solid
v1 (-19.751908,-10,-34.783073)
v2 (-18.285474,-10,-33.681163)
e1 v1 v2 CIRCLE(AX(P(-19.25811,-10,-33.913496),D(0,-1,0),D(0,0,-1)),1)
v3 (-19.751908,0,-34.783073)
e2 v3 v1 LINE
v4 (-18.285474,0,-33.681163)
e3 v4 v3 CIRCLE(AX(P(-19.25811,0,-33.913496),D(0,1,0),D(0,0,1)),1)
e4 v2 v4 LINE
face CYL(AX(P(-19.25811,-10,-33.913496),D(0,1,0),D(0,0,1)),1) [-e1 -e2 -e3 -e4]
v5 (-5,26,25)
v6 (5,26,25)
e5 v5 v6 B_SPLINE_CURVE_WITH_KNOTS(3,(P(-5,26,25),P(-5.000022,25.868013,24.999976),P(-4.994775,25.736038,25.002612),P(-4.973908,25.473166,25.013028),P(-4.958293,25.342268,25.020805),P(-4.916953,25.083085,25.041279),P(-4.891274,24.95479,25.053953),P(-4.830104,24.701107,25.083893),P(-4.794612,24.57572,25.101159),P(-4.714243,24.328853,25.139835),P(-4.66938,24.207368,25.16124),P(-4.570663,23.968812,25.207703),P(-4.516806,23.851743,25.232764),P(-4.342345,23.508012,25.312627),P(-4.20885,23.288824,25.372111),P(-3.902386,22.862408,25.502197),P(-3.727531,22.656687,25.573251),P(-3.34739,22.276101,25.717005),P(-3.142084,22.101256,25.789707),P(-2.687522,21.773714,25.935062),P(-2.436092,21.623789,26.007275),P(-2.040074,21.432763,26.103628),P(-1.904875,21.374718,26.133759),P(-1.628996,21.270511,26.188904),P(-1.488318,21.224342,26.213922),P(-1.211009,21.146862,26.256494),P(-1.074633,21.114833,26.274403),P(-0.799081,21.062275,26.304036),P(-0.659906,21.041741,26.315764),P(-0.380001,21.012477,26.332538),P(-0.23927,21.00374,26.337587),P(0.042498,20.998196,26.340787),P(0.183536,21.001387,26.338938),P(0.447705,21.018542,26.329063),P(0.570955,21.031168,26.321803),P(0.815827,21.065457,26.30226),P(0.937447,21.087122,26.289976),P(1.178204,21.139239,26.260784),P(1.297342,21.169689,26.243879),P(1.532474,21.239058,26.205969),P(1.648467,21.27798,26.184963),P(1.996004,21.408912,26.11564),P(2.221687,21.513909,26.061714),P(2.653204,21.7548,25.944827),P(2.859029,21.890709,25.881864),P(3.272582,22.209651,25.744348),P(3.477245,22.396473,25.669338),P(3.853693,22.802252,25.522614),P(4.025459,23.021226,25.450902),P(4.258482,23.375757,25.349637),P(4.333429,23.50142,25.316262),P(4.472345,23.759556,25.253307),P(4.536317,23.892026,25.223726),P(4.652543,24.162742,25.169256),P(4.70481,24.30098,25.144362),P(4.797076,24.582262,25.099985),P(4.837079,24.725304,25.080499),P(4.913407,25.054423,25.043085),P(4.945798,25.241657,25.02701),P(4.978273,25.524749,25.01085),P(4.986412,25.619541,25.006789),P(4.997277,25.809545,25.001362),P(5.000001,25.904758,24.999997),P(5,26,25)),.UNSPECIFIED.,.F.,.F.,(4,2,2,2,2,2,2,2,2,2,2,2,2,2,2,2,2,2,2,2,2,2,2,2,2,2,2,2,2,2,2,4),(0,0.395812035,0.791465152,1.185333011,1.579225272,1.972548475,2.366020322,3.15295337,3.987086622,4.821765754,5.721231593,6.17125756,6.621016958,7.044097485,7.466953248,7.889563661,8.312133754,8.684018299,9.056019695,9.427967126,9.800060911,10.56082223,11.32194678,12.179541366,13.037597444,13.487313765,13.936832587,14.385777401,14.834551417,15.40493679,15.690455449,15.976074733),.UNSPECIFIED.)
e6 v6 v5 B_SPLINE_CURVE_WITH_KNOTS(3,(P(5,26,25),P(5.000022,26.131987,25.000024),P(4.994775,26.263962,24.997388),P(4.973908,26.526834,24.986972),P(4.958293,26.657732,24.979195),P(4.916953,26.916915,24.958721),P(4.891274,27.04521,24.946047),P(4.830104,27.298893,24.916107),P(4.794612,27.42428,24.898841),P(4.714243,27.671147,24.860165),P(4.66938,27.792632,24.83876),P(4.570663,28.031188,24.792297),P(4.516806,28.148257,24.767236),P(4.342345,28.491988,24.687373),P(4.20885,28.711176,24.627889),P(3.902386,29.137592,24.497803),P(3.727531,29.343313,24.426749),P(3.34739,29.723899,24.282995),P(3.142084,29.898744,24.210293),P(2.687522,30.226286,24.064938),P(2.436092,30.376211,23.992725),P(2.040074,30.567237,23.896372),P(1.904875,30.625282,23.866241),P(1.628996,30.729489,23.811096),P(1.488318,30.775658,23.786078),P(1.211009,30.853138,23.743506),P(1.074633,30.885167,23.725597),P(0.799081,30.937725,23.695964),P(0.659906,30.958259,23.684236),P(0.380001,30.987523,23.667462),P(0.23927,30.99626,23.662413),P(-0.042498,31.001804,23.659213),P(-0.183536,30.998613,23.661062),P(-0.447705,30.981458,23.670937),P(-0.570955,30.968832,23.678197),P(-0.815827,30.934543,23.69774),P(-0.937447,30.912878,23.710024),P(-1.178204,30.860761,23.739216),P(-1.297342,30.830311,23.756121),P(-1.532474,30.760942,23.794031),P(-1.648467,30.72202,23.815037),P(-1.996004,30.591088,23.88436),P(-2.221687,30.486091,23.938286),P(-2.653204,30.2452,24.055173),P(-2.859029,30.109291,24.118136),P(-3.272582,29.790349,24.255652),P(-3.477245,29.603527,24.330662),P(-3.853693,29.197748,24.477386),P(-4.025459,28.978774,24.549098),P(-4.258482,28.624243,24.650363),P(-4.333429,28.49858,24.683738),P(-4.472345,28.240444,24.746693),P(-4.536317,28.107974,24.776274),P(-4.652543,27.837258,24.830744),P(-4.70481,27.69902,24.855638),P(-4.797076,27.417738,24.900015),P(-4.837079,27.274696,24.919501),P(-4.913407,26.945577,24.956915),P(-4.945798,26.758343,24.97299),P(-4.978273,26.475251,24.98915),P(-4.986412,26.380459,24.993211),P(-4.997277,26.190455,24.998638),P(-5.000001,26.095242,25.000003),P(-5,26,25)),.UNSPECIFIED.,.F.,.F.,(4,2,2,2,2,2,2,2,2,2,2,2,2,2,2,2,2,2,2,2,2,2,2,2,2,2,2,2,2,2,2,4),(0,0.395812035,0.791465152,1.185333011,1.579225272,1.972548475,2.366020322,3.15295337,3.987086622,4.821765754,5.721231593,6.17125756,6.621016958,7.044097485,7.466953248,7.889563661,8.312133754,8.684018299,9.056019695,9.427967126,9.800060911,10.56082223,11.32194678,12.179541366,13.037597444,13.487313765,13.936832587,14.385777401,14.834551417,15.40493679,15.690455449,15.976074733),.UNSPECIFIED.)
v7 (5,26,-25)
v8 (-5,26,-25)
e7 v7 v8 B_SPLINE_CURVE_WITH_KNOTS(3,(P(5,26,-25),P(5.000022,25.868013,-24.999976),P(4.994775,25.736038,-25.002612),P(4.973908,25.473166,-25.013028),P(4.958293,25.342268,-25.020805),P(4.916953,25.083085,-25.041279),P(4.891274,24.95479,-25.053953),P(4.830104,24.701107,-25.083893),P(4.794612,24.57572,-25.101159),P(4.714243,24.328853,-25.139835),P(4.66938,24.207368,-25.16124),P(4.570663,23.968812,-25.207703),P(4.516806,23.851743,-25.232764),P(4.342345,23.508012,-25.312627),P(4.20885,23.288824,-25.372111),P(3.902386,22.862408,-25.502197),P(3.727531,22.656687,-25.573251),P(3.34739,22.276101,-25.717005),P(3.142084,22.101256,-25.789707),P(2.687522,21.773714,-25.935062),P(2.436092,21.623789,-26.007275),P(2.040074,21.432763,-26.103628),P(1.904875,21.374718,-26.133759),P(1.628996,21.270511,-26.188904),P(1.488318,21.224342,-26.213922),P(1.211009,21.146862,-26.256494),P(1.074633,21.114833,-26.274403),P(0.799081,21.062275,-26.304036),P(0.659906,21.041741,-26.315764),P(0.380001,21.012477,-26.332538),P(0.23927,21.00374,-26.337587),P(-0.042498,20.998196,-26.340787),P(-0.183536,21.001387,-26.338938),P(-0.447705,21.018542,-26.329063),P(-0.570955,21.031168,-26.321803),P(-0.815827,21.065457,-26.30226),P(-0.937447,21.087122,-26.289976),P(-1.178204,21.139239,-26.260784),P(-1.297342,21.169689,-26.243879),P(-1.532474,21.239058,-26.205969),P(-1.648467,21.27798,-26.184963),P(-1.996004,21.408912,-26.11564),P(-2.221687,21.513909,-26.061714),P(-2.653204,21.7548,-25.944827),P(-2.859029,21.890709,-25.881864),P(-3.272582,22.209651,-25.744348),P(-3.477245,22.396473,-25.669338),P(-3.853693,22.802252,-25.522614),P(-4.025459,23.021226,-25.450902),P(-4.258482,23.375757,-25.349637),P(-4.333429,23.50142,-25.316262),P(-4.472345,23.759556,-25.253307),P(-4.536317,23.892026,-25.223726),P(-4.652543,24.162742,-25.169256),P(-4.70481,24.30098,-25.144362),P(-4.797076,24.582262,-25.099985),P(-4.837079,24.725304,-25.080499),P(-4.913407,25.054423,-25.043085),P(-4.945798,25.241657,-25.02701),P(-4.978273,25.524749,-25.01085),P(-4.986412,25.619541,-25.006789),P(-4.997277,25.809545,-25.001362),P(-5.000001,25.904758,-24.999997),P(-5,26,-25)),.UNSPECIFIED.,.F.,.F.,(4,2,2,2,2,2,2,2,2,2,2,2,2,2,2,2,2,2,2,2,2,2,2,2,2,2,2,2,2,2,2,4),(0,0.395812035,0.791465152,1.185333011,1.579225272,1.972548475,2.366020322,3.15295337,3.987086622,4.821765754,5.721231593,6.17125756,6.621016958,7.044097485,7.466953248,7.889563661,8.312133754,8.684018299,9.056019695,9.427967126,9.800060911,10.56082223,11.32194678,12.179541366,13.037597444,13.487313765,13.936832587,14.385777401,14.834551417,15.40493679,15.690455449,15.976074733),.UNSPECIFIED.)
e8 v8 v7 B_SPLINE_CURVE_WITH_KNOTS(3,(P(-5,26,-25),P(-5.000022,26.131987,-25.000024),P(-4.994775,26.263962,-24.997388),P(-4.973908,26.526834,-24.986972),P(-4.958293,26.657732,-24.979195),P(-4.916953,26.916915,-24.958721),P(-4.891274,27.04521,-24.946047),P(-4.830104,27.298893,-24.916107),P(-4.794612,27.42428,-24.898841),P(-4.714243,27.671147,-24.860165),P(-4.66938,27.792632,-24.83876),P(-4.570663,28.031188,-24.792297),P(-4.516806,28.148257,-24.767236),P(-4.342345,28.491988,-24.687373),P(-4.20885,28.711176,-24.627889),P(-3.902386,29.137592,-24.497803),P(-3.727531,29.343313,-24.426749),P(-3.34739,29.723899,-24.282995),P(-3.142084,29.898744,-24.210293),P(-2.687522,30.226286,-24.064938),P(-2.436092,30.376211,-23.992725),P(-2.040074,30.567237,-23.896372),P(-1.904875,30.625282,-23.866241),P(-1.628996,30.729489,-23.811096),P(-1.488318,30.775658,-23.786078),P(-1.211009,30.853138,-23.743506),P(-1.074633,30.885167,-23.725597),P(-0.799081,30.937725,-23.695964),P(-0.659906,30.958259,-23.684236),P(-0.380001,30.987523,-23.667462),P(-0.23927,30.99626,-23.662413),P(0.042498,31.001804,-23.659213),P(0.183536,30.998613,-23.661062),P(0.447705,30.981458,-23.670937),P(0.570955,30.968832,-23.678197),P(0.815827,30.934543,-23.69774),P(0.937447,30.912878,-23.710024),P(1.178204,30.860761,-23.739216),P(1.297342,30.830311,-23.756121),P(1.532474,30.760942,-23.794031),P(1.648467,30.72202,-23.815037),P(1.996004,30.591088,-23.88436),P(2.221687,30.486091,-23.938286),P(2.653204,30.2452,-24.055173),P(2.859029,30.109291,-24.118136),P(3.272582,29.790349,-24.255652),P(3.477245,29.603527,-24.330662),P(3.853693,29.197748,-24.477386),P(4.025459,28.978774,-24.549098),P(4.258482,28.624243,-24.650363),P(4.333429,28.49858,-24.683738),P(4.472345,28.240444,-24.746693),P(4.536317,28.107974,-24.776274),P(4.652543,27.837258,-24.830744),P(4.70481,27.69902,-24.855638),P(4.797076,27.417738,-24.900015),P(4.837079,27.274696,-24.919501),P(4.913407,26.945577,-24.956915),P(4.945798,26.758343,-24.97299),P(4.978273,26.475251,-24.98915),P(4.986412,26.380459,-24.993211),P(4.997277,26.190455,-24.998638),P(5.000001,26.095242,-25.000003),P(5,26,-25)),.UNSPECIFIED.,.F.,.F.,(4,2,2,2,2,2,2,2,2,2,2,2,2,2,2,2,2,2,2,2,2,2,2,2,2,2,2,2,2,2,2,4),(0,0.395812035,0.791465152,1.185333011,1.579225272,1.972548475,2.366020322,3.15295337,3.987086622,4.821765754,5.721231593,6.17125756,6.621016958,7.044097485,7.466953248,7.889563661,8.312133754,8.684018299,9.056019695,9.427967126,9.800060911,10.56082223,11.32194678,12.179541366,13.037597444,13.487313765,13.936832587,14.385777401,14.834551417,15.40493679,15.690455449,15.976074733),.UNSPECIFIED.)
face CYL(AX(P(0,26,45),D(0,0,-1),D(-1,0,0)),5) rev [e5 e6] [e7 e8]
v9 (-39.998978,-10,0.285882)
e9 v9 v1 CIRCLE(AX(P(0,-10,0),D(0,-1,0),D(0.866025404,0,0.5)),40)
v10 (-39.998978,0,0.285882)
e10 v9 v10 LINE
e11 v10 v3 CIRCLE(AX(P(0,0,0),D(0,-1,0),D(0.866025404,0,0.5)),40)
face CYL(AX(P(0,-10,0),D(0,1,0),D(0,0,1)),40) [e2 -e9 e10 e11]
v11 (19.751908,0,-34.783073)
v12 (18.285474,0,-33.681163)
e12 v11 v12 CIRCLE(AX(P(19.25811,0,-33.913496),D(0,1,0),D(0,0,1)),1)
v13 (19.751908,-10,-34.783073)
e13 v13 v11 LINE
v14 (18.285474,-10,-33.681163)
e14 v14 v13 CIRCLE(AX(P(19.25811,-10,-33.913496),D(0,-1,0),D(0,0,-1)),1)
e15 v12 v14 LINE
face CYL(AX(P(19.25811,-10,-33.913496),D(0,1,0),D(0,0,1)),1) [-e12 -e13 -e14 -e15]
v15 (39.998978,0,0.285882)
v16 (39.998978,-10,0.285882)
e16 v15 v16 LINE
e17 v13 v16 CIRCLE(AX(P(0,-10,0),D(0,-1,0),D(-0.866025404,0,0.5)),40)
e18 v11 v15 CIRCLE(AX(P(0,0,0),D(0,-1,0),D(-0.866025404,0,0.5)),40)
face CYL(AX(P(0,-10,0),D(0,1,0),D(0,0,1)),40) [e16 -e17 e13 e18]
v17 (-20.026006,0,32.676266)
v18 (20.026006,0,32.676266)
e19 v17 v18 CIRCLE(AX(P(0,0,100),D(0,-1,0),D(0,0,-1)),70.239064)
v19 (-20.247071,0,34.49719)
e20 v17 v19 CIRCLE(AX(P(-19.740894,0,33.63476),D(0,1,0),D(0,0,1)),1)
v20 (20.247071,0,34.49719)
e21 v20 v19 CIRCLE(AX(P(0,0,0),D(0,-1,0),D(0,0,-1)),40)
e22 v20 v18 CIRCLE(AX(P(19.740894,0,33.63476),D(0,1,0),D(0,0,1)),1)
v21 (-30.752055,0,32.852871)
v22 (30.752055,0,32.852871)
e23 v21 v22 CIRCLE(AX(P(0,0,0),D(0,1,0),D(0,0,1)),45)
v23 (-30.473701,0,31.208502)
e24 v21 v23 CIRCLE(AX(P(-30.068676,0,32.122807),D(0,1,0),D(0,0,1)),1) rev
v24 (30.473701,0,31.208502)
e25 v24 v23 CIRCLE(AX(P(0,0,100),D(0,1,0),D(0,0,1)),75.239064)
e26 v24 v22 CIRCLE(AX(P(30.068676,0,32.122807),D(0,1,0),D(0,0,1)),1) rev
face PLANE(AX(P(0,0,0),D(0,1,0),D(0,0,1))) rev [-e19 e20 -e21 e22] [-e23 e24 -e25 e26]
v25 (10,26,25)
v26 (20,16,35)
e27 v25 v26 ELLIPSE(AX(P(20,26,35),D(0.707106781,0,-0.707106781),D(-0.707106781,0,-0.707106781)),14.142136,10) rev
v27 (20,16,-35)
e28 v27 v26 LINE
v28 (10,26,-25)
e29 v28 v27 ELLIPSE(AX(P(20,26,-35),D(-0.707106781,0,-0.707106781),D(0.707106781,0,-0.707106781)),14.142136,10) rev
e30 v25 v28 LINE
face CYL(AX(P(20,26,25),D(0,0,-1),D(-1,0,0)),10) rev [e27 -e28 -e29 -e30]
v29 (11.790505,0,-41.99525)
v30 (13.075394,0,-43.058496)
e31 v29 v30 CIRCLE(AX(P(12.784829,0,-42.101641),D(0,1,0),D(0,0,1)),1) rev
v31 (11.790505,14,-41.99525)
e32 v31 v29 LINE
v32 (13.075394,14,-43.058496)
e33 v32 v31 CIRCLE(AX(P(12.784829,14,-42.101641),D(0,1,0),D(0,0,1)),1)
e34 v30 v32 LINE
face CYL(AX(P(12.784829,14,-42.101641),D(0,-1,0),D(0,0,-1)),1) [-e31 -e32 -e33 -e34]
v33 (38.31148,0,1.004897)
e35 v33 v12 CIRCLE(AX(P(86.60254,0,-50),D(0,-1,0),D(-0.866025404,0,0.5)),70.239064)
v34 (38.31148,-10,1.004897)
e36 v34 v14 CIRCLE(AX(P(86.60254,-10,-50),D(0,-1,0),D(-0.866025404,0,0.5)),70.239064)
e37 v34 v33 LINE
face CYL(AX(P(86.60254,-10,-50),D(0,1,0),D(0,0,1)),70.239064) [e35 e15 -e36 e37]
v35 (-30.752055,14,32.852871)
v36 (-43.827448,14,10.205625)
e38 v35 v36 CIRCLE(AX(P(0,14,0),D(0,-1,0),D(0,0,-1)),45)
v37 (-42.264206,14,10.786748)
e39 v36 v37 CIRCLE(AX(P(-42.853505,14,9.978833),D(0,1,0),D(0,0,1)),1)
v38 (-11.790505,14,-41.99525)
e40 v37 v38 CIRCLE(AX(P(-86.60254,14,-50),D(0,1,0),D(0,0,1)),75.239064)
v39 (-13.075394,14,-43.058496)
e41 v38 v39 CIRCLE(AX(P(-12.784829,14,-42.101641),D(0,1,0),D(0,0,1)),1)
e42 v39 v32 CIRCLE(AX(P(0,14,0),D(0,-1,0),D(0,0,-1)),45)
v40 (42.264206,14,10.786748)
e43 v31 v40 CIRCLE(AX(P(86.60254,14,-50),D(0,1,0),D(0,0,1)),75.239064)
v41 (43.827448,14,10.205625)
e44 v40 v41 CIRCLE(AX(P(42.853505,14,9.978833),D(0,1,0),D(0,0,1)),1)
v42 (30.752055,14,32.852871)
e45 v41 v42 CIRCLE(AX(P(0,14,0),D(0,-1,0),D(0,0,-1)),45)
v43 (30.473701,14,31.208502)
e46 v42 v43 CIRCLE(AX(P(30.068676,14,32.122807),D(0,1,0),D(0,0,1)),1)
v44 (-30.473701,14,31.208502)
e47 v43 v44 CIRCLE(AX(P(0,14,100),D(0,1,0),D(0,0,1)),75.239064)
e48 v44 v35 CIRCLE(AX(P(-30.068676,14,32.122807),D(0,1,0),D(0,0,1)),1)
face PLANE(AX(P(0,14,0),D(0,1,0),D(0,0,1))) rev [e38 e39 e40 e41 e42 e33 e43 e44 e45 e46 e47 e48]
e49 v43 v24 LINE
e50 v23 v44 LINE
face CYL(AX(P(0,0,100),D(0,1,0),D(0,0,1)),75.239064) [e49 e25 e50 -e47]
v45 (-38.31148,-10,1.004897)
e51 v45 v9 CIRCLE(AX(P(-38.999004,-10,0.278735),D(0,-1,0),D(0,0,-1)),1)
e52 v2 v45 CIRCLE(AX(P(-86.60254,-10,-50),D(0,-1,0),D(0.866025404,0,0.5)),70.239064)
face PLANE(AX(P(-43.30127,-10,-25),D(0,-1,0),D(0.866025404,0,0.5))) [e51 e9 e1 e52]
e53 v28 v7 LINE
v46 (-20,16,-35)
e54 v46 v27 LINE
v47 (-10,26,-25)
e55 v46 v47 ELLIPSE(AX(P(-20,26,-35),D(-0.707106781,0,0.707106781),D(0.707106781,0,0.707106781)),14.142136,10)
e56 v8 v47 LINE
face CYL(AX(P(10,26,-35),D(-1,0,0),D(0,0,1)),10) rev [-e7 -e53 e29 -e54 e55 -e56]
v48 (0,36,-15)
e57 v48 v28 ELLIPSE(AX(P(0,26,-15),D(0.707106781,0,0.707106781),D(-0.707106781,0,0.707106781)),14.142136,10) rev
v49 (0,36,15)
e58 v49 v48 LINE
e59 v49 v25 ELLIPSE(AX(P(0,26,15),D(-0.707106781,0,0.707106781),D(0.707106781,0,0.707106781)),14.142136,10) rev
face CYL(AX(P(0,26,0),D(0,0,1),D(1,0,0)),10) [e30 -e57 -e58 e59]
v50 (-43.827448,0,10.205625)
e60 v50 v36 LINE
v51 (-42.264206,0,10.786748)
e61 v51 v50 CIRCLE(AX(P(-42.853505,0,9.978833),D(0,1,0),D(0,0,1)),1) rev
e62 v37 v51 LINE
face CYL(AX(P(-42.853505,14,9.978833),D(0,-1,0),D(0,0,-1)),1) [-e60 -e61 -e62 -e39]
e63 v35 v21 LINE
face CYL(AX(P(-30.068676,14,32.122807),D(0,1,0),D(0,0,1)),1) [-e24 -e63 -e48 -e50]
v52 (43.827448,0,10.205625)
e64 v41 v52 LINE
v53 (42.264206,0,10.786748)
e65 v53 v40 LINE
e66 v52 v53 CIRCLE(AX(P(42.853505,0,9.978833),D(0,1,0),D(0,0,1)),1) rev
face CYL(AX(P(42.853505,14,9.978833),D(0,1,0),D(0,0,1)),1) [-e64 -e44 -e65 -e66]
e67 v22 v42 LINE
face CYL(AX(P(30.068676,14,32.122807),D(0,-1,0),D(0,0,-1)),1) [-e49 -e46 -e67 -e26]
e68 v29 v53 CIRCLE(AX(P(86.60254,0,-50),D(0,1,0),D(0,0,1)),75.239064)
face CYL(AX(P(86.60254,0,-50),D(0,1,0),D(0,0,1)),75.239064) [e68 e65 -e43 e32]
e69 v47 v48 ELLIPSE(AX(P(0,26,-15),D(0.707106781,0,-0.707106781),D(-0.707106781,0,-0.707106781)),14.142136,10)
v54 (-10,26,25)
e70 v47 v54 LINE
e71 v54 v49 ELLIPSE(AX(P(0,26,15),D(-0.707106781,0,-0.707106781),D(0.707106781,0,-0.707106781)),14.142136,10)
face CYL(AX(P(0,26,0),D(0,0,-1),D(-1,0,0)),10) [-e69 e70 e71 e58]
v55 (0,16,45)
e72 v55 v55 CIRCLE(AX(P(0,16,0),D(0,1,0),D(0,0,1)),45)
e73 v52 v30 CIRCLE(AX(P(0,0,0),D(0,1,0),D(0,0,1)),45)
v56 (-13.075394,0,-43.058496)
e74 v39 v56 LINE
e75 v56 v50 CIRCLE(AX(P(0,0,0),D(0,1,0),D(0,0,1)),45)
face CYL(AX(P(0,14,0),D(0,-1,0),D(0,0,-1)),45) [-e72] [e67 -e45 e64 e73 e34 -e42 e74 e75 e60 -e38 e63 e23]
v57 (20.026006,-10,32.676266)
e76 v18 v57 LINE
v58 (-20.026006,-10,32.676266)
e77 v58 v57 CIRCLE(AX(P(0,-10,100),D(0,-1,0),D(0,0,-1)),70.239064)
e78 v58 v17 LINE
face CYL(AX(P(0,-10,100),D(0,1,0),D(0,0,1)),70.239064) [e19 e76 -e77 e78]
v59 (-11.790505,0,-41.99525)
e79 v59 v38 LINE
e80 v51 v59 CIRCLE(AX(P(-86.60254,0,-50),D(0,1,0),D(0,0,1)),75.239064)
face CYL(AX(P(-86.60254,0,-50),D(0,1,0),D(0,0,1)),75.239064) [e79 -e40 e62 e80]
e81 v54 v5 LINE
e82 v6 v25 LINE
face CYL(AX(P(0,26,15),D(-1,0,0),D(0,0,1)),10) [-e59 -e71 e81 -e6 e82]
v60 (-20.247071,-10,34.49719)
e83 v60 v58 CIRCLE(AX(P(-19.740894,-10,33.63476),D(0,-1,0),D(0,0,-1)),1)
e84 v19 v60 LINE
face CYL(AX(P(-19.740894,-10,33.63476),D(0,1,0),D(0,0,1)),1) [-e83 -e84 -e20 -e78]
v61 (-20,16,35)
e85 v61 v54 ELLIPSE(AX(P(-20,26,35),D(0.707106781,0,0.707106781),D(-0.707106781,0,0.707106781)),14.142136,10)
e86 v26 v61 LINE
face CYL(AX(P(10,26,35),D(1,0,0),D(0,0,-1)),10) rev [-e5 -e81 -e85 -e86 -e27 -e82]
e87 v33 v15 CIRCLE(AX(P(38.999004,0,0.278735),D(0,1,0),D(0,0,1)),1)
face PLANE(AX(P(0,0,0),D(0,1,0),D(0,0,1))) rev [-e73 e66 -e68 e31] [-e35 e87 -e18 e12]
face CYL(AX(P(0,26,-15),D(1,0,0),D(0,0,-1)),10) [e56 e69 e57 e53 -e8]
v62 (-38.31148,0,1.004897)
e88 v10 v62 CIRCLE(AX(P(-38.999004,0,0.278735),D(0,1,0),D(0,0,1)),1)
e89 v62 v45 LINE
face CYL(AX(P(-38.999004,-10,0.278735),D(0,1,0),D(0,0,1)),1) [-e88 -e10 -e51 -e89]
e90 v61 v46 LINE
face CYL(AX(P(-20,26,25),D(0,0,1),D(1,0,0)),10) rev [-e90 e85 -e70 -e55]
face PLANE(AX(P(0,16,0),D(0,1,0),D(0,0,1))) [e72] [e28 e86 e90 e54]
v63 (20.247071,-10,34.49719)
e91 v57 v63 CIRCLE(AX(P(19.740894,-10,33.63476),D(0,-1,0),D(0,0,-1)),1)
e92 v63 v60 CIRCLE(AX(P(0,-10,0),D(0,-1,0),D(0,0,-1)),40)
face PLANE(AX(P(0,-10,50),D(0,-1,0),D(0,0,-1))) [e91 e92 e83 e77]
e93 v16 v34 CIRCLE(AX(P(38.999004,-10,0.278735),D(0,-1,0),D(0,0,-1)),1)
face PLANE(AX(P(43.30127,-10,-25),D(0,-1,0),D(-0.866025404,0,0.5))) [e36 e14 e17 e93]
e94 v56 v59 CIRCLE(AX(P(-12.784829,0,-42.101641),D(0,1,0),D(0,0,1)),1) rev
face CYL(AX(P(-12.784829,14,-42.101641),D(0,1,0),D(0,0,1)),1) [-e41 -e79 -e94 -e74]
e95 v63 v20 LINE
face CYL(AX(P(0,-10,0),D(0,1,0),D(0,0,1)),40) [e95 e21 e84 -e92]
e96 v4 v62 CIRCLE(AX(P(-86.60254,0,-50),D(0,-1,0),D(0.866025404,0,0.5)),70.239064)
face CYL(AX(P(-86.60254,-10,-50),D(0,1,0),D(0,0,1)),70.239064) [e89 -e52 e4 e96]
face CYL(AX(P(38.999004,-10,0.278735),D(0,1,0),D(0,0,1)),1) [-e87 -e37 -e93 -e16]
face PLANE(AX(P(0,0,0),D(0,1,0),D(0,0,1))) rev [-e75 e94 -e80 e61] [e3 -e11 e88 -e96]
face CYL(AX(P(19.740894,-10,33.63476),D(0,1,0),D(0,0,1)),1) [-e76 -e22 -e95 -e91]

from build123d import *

# Parameters (mm, degrees)
SKETCH1_R                = 37.5
BOSS_EXTRUDE1_DEPTH      = 14
CUT_EXTRUDE2_START       = -14
CUT_EXTRUDE2_DEPTH       = 14
SKETCH4_R                = 45
SKETCH4_R_2              = 37.5
BOSS_EXTRUDE2_DEPTH      = 14
SKETCH6_R                = 45
BOSS_EXTRUDE3_DEPTH      = 2
SKETCH7_R                = 1.75
CUT_EXTRUDE3_DEPTH       = 66.620118866
CIRPATTERN2_COUNT        = 3
BOSS_EXTRUDE4_DEPTH      = 10
FILLET1_R                = 1
CIRPATTERN3_COUNT        = 3
FILLET1_OF_CIRPATTERN3_R = 1
CUT_EXTRUDE4_DEPTH       = 69.01470446
FILLET2_R                = 1
SKETCH15_R               = 45
BOSS_EXTRUDE5_DEPTH      = 2
SKETCH16_W               = 20
SKETCH16_H               = 50
BOSS_EXTRUDE6_DEPTH      = 20
SKETCH17_R               = 5
CUT_EXTRUDE5_DEPTH       = 91.669730467
FILLET3_R                = 10


# Read off the part's stored shape, not the designer's step: Cut-Extrude2
with BuildPart() as part:
    # Sketch1 → Boss-Extrude1 (new body)
    with BuildSketch(Plane(origin=(0, 0, 0), x_dir=(1, 0, 0), z_dir=(0, 1, 0))):
        with Locations(Location((0, 0, 0), (0, 0, 270))):
            Circle(SKETCH1_R)
    extrude(amount=BOSS_EXTRUDE1_DEPTH)

    # Cut-Extrude2 outline → Cut-Extrude2 (cut)
    with BuildSketch(Plane(origin=(0, 14, 0), x_dir=(1, 0, 0), z_dir=(0, 1, 0)).offset(CUT_EXTRUDE2_START)):
        with BuildLine():
            ThreePointArc((-24.104535363, -28.726666617), (0, -24.760936498), (24.104535363, -28.726666617))
            ThreePointArc((24.104535363, -28.726666617), (32.475952642, -18.75), (36.930290738, -6.511806663))
            ThreePointArc((36.930290738, -6.511806663), (21.443600029, 12.380468249), (12.825755375, 35.238473279))
            ThreePointArc((12.825755375, 35.238473279), (0, 37.5), (-12.825755375, 35.238473279))
            ThreePointArc((-12.825755375, 35.238473279), (-21.443600029, 12.380468249), (-36.930290738, -6.511806663))
            ThreePointArc((-36.930290738, -6.511806663), (-32.475952642, -18.75), (-24.104535363, -28.726666617))
        make_face()
    extrude(amount=CUT_EXTRUDE2_DEPTH, mode=Mode.SUBTRACT)

    # Sketch4 → Boss-Extrude2 (add)
    with BuildSketch(Plane(origin=(0, 0, 0), x_dir=(1, 0, 0), z_dir=(0, 1, 0))):
        with Locations(Location((0, 0, 0), (0, 0, 270))):
            Circle(SKETCH4_R)
        Circle(SKETCH4_R_2, mode=Mode.SUBTRACT)
    extrude(amount=BOSS_EXTRUDE2_DEPTH)

    # Sketch6 → Boss-Extrude3 (add)
    with BuildSketch(Plane(origin=(0, 14, 0), x_dir=(1, 0, 0), z_dir=(0, 1, 0))):
        with Locations(Location((0, 0, 0), (0, 0, 270))):
            Circle(SKETCH6_R)
        with BuildLine():
            ThreePointArc((-28.952849653, 1.653026611), (-25.11473671, -14.5), (-13.044861788, -25.900416617))
            ThreePointArc((-13.044861788, -25.900416617), (0, -24.760936498), (13.044861788, -25.900416617))
            ThreePointArc((13.044861788, -25.900416617), (25.11473671, -14.5), (28.952849653, 1.653026611))
            ThreePointArc((28.952849653, 1.653026611), (21.443600029, 12.380468249), (15.907987865, 24.247390006))
            ThreePointArc((15.907987865, 24.247390006), (0, 29), (-15.907987865, 24.247390006))
            ThreePointArc((-15.907987865, 24.247390006), (-21.443600029, 12.380468249), (-28.952849653, 1.653026611))
        make_face(mode=Mode.SUBTRACT)
    extrude(amount=BOSS_EXTRUDE3_DEPTH)

    # Sketch7 → Cut-Extrude3 (cut, through all)
    with BuildSketch(Plane(origin=(0, 16, 0), x_dir=(1, 0, 0), z_dir=(0, 1, 0))):
        with Locations(Location((0, 32, 0), (0, 0, 270))):
            Circle(SKETCH7_R)
    cut_extrude3 = extrude(amount=-CUT_EXTRUDE3_DEPTH, mode=Mode.SUBTRACT)

    # CirPattern2: Cut-Extrude3 ×3 about axis
    cirpattern2_axis = Axis((0, 0, 0), (0, 1, 0))
    for i in range(1, CIRPATTERN2_COUNT):
        add(cut_extrude3.rotate(cirpattern2_axis, i * 360 / CIRPATTERN2_COUNT), mode=Mode.SUBTRACT)

    # Sketch13 → Boss-Extrude4 (add)
    with BuildSketch(Plane.XZ):
        with BuildLine():
            ThreePointArc((-22.11228446, 33.332369792), (0, 29.760936498), (22.11228446, 33.332369792))
            ThreePointArc((22.11228446, 33.332369792), (0, 40), (-22.11228446, 33.332369792))
        make_face()
    boss_extrude4 = extrude(amount=BOSS_EXTRUDE4_DEPTH)

    # Fillet1
    fillet1_edges = [part.edges().sort_by_distance(p)[0] for p in [
        (22.11228446, -5, 33.332369792),
        (-22.11228446, -5, 33.332369792),
    ]]
    fillet(fillet1_edges, radius=FILLET1_R)

    # CirPattern3: Boss-Extrude4 ×3 about axis
    cirpattern3_axis = Axis((0, 0, 0), (0, 1, 0))
    for i in range(1, CIRPATTERN3_COUNT):
        add(boss_extrude4.rotate(cirpattern3_axis, i * 360 / CIRPATTERN3_COUNT))

    # Fillet1 of CirPattern3
    fillet1_of_cirpattern3_edges = [part.edges().sort_by_distance(p)[0] for p in [
        (17.810536778, -5, -35.815984974),
        (39.922821238, -5, 2.483615182),
        (-39.922821238, -5, 2.483615182),
        (-17.810536778, -5, -35.815984974),
    ]]
    fillet(fillet1_of_cirpattern3_edges, radius=FILLET1_OF_CIRPATTERN3_R)

    # Sketch14 → Cut-Extrude4 (cut, through all)
    with BuildSketch(Plane.XZ.offset(-14)):
        with BuildLine():
            Line((-33.206244265, 32.485097805), (-44.736042076, 12.514902195))
            ThreePointArc((-44.736042076, 12.514902195), (-21.443600029, -12.380468249), (-11.529797811, -45))
            Line((-11.529797811, -45), (11.529797811, -45))
            ThreePointArc((11.529797811, -45), (21.443600029, -12.380468249), (44.736042076, 12.514902195))
            Line((44.736042076, 12.514902195), (33.206244265, 32.485097805))
            ThreePointArc((33.206244265, 32.485097805), (0, 24.760936498), (-33.206244265, 32.485097805))
        make_face()
    extrude(amount=CUT_EXTRUDE4_DEPTH, mode=Mode.SUBTRACT)

    # Fillet2
    fillet2_edges = [part.edges().sort_by_distance(p)[0] for p in [
        (43.466885988, 7, 11.646021745),
        (11.64769231, 7, -43.466438362),
        (-31.819193678, 7, 31.820416617),
        (31.819193678, 7, 31.820416617),
        (-11.64769231, 7, -43.466438362),
        (-43.466885988, 7, 11.646021745),
    ]]
    fillet(fillet2_edges, radius=FILLET2_R)

    # Sketch15 → Boss-Extrude5 (add)
    with BuildSketch(Plane.XZ.offset(-14)):
        with Locations(Location((0, 0, 0), (0, 0, 253.108257002))):
            Circle(SKETCH15_R)
    extrude(amount=-BOSS_EXTRUDE5_DEPTH)

    # Sketch16 → Boss-Extrude6 (add)
    with BuildSketch(Plane(origin=(0, 16, 0), x_dir=(1, 0, 0), z_dir=(0, 1, 0))):
        Rectangle(SKETCH16_W, SKETCH16_H)
    extrude(amount=BOSS_EXTRUDE6_DEPTH)

    # Sketch17 → Cut-Extrude5 (cut, through all)
    with BuildSketch(Plane(origin=(0, 0, -25), x_dir=(-1, 0, 0), z_dir=(0, 0, -1))):
        with Locations((0, 26)):
            Circle(SKETCH17_R)
    extrude(amount=-CUT_EXTRUDE5_DEPTH, mode=Mode.SUBTRACT)

    # Fillet3
    # the kernel refuses this fillet: 10 mm, written as the material it adds along each edge
    with BuildSketch(Plane(origin=(-10, 16, -25), x_dir=(0, 0, -1), z_dir=(1, 0, 0))) as fillet3_piece_1_section:
        with BuildLine():
            CenterArc((FILLET3_R, FILLET3_R), FILLET3_R, 180, 90)
            Line((0, FILLET3_R), (0, 0))
            Line((0, 0), (FILLET3_R, 0))
        make_face()
    fillet3_piece_1 = extrude(amount=20, mode=Mode.PRIVATE)
    fillet3_piece_1 = fillet3_piece_1 - Plane(origin=(0, 26, -27.35205283), x_dir=(-1, 0, 0), z_dir=(0, 0, -1)) * Cylinder(5, 80, mode=Mode.PRIVATE)
    add(fillet3_piece_1)
    with BuildSketch(Plane(origin=(10, 16, 25), x_dir=(0, 0, 1), z_dir=(-1, 0, 0))) as fillet3_piece_2_section:
        with BuildLine():
            CenterArc((FILLET3_R, FILLET3_R), FILLET3_R, 180, 90)
            Line((0, FILLET3_R), (0, 0))
            Line((0, 0), (FILLET3_R, 0))
        make_face()
    fillet3_piece_2 = extrude(amount=20, mode=Mode.PRIVATE)
    fillet3_piece_2 = fillet3_piece_2 - Plane(origin=(0, 26, 27.35205283), x_dir=(-1, 0, 0), z_dir=(0, 0, -1)) * Cylinder(5, 80, mode=Mode.PRIVATE)
    add(fillet3_piece_2)
    with BuildSketch(Plane(origin=(10, 16, -25), x_dir=(1, 0, 0), z_dir=(0, 0, 1)), Plane(origin=(-10, 16, 25), x_dir=(-1, 0, 0), z_dir=(0, 0, -1))) as fillet3_piece_3:
        with BuildLine():
            CenterArc((FILLET3_R, FILLET3_R), FILLET3_R, 180, 90)
            Line((0, FILLET3_R), (0, 0))
            Line((0, 0), (FILLET3_R, 0))
        make_face()
    extrude(amount=50)
    with BuildSketch(Plane(origin=(-35, 16, -25), x_dir=(0, 0, -1), z_dir=(1, 0, 0))) as fillet3_piece_4a_section:
        with BuildLine():
            CenterArc((FILLET3_R, FILLET3_R), FILLET3_R, 180, 90)
            Line((0, FILLET3_R), (0, 0))
            Line((0, 0), (FILLET3_R, 0))
        make_face()
    fillet3_piece_4a = extrude(amount=45, mode=Mode.PRIVATE)
    fillet3_piece_4a = fillet3_piece_4a & Plane(origin=(0, 18.302066934, 0), x_dir=(0, 0, 1), z_dir=(0, -1, 0)) * Cylinder(45, 130, mode=Mode.PRIVATE)
    fillet3_piece_4a = split(fillet3_piece_4a, bisect_by=Plane(origin=(-10, 18.302066934, -27.180095081), z_dir=(-1, 0, 0)), keep=Keep.TOP, mode=Mode.PRIVATE)
    with BuildSketch(Plane(origin=(-10, 16, 25), x_dir=(-1, 0, 0), z_dir=(0, 0, -1))) as fillet3_piece_4b_section:
        with BuildLine():
            CenterArc((FILLET3_R, FILLET3_R), FILLET3_R, 180, 90)
            Line((0, FILLET3_R), (0, 0))
            Line((0, 0), (FILLET3_R, 0))
        make_face()
    fillet3_piece_4b = extrude(amount=75, mode=Mode.PRIVATE)
    fillet3_piece_4b = fillet3_piece_4b & Plane(origin=(0, 18.30933206, 0), x_dir=(0, 0, 1), z_dir=(0, -1, 0)) * Cylinder(45, 190, mode=Mode.PRIVATE)
    fillet3_piece_4b = split(fillet3_piece_4b, bisect_by=Plane(origin=(-12.183620905, 18.30933206, -25), z_dir=(0, 0, -1)), keep=Keep.TOP, mode=Mode.PRIVATE)
    fillet3_piece_4 = fillet3_piece_4a & fillet3_piece_4b
    add(fillet3_piece_4)
    with BuildSketch(Plane(origin=(10, 16, -50), x_dir=(1, 0, 0), z_dir=(0, 0, 1))) as fillet3_piece_5a_section:
        with BuildLine():
            CenterArc((FILLET3_R, FILLET3_R), FILLET3_R, 180, 90)
            Line((0, FILLET3_R), (0, 0))
            Line((0, 0), (FILLET3_R, 0))
        make_face()
    fillet3_piece_5a = extrude(amount=75, mode=Mode.PRIVATE)
    fillet3_piece_5a = fillet3_piece_5a & Plane(origin=(0, 18.309328242, 0), x_dir=(0, 0, 1), z_dir=(0, -1, 0)) * Cylinder(45, 190, mode=Mode.PRIVATE)
    fillet3_piece_5a = split(fillet3_piece_5a, bisect_by=Plane(origin=(12.1836193, 18.309328242, -25), z_dir=(0, 0, -1)), keep=Keep.TOP, mode=Mode.PRIVATE)
    with BuildSketch(Plane(origin=(-10, 16, -25), x_dir=(0, 0, -1), z_dir=(1, 0, 0))) as fillet3_piece_5b_section:
        with BuildLine():
            CenterArc((FILLET3_R, FILLET3_R), FILLET3_R, 180, 90)
            Line((0, FILLET3_R), (0, 0))
            Line((0, 0), (FILLET3_R, 0))
        make_face()
    fillet3_piece_5b = extrude(amount=45, mode=Mode.PRIVATE)
    fillet3_piece_5b = fillet3_piece_5b & Plane(origin=(0, 18.30206696, 0), x_dir=(0, 0, 1), z_dir=(0, -1, 0)) * Cylinder(45, 130, mode=Mode.PRIVATE)
    fillet3_piece_5b = split(fillet3_piece_5b, bisect_by=Plane(origin=(10, 18.30206696, -27.180094929), z_dir=(1, 0, 0)), keep=Keep.TOP, mode=Mode.PRIVATE)
    fillet3_piece_5 = fillet3_piece_5a & fillet3_piece_5b
    add(fillet3_piece_5)
    with BuildSketch(Plane(origin=(10, 16, -25), x_dir=(1, 0, 0), z_dir=(0, 0, 1))) as fillet3_piece_6a_section:
        with BuildLine():
            CenterArc((FILLET3_R, FILLET3_R), FILLET3_R, 180, 90)
            Line((0, FILLET3_R), (0, 0))
            Line((0, 0), (FILLET3_R, 0))
        make_face()
    fillet3_piece_6a = extrude(amount=75, mode=Mode.PRIVATE)
    fillet3_piece_6a = fillet3_piece_6a & Plane(origin=(0, 18.30933206, 0), x_dir=(0, 0, 1), z_dir=(0, -1, 0)) * Cylinder(45, 190, mode=Mode.PRIVATE)
    fillet3_piece_6a = split(fillet3_piece_6a, bisect_by=Plane(origin=(12.183620905, 18.30933206, 25), z_dir=(0, 0, 1)), keep=Keep.TOP, mode=Mode.PRIVATE)
    with BuildSketch(Plane(origin=(35, 16, 25), x_dir=(0, 0, 1), z_dir=(-1, 0, 0))) as fillet3_piece_6b_section:
        with BuildLine():
            CenterArc((FILLET3_R, FILLET3_R), FILLET3_R, 180, 90)
            Line((0, FILLET3_R), (0, 0))
            Line((0, 0), (FILLET3_R, 0))
        make_face()
    fillet3_piece_6b = extrude(amount=45, mode=Mode.PRIVATE)
    fillet3_piece_6b = fillet3_piece_6b & Plane(origin=(0, 18.302066934, 0), x_dir=(0, 0, 1), z_dir=(0, -1, 0)) * Cylinder(45, 130, mode=Mode.PRIVATE)
    fillet3_piece_6b = split(fillet3_piece_6b, bisect_by=Plane(origin=(10, 18.302066934, 27.180095081), z_dir=(1, 0, 0)), keep=Keep.TOP, mode=Mode.PRIVATE)
    fillet3_piece_6 = fillet3_piece_6a & fillet3_piece_6b
    add(fillet3_piece_6)
    with BuildSketch(Plane(origin=(-10, 16, 50), x_dir=(-1, 0, 0), z_dir=(0, 0, -1))) as fillet3_piece_7a_section:
        with BuildLine():
            CenterArc((FILLET3_R, FILLET3_R), FILLET3_R, 180, 90)
            Line((0, FILLET3_R), (0, 0))
            Line((0, 0), (FILLET3_R, 0))
        make_face()
    fillet3_piece_7a = extrude(amount=75, mode=Mode.PRIVATE)
    fillet3_piece_7a = fillet3_piece_7a & Plane(origin=(0, 18.309328242, 0), x_dir=(0, 0, 1), z_dir=(0, -1, 0)) * Cylinder(45, 190, mode=Mode.PRIVATE)
    fillet3_piece_7a = split(fillet3_piece_7a, bisect_by=Plane(origin=(-12.1836193, 18.309328242, 25), z_dir=(0, 0, 1)), keep=Keep.TOP, mode=Mode.PRIVATE)
    with BuildSketch(Plane(origin=(10, 16, 25), x_dir=(0, 0, 1), z_dir=(-1, 0, 0))) as fillet3_piece_7b_section:
        with BuildLine():
            CenterArc((FILLET3_R, FILLET3_R), FILLET3_R, 180, 90)
            Line((0, FILLET3_R), (0, 0))
            Line((0, 0), (FILLET3_R, 0))
        make_face()
    fillet3_piece_7b = extrude(amount=45, mode=Mode.PRIVATE)
    fillet3_piece_7b = fillet3_piece_7b & Plane(origin=(0, 18.302066961, 0), x_dir=(0, 0, 1), z_dir=(0, -1, 0)) * Cylinder(45, 130, mode=Mode.PRIVATE)
    fillet3_piece_7b = split(fillet3_piece_7b, bisect_by=Plane(origin=(-10, 18.302066961, 27.180094929), z_dir=(-1, 0, 0)), keep=Keep.TOP, mode=Mode.PRIVATE)
    fillet3_piece_7 = fillet3_piece_7a & fillet3_piece_7b
    add(fillet3_piece_7)
    # the kernel refuses this fillet: 10 mm, written as the material it takes off along each edge
    with BuildSketch(Plane(origin=(-35, 36, -25), x_dir=(0, 0, 1), z_dir=(1, 0, 0))) as fillet3_2_piece_1:
        with BuildLine():
            CenterArc((FILLET3_R, FILLET3_R), FILLET3_R, 180, 90)
            Line((0, FILLET3_R), (0, 0))
            Line((0, 0), (FILLET3_R, 0))
        make_face()
    extrude(amount=70, mode=Mode.SUBTRACT)
    with BuildSketch(Plane(origin=(35, 36, 25), x_dir=(0, -1, 0), z_dir=(-1, 0, 0))) as fillet3_2_piece_2:
        with BuildLine():
            CenterArc((FILLET3_R, -FILLET3_R), FILLET3_R, 90, 90)
            Line((0, -FILLET3_R), (0, 0))
            Line((0, 0), (FILLET3_R, 0))
        make_face()
    extrude(amount=70, mode=Mode.SUBTRACT)
    with BuildSketch(Plane(origin=(10, 36, -50), x_dir=(0, -1, 0), z_dir=(0, 0, 1)), Plane(origin=(-10, 36, 50), x_dir=(0, -1, 0), z_dir=(0, 0, -1))) as fillet3_2_piece_3:
        with BuildLine():
            CenterArc((FILLET3_R, -FILLET3_R), FILLET3_R, 90, 90)
            Line((0, -FILLET3_R), (0, 0))
            Line((0, 0), (FILLET3_R, 0))
        make_face()
    extrude(amount=100, mode=Mode.SUBTRACT)


solid = part.part
